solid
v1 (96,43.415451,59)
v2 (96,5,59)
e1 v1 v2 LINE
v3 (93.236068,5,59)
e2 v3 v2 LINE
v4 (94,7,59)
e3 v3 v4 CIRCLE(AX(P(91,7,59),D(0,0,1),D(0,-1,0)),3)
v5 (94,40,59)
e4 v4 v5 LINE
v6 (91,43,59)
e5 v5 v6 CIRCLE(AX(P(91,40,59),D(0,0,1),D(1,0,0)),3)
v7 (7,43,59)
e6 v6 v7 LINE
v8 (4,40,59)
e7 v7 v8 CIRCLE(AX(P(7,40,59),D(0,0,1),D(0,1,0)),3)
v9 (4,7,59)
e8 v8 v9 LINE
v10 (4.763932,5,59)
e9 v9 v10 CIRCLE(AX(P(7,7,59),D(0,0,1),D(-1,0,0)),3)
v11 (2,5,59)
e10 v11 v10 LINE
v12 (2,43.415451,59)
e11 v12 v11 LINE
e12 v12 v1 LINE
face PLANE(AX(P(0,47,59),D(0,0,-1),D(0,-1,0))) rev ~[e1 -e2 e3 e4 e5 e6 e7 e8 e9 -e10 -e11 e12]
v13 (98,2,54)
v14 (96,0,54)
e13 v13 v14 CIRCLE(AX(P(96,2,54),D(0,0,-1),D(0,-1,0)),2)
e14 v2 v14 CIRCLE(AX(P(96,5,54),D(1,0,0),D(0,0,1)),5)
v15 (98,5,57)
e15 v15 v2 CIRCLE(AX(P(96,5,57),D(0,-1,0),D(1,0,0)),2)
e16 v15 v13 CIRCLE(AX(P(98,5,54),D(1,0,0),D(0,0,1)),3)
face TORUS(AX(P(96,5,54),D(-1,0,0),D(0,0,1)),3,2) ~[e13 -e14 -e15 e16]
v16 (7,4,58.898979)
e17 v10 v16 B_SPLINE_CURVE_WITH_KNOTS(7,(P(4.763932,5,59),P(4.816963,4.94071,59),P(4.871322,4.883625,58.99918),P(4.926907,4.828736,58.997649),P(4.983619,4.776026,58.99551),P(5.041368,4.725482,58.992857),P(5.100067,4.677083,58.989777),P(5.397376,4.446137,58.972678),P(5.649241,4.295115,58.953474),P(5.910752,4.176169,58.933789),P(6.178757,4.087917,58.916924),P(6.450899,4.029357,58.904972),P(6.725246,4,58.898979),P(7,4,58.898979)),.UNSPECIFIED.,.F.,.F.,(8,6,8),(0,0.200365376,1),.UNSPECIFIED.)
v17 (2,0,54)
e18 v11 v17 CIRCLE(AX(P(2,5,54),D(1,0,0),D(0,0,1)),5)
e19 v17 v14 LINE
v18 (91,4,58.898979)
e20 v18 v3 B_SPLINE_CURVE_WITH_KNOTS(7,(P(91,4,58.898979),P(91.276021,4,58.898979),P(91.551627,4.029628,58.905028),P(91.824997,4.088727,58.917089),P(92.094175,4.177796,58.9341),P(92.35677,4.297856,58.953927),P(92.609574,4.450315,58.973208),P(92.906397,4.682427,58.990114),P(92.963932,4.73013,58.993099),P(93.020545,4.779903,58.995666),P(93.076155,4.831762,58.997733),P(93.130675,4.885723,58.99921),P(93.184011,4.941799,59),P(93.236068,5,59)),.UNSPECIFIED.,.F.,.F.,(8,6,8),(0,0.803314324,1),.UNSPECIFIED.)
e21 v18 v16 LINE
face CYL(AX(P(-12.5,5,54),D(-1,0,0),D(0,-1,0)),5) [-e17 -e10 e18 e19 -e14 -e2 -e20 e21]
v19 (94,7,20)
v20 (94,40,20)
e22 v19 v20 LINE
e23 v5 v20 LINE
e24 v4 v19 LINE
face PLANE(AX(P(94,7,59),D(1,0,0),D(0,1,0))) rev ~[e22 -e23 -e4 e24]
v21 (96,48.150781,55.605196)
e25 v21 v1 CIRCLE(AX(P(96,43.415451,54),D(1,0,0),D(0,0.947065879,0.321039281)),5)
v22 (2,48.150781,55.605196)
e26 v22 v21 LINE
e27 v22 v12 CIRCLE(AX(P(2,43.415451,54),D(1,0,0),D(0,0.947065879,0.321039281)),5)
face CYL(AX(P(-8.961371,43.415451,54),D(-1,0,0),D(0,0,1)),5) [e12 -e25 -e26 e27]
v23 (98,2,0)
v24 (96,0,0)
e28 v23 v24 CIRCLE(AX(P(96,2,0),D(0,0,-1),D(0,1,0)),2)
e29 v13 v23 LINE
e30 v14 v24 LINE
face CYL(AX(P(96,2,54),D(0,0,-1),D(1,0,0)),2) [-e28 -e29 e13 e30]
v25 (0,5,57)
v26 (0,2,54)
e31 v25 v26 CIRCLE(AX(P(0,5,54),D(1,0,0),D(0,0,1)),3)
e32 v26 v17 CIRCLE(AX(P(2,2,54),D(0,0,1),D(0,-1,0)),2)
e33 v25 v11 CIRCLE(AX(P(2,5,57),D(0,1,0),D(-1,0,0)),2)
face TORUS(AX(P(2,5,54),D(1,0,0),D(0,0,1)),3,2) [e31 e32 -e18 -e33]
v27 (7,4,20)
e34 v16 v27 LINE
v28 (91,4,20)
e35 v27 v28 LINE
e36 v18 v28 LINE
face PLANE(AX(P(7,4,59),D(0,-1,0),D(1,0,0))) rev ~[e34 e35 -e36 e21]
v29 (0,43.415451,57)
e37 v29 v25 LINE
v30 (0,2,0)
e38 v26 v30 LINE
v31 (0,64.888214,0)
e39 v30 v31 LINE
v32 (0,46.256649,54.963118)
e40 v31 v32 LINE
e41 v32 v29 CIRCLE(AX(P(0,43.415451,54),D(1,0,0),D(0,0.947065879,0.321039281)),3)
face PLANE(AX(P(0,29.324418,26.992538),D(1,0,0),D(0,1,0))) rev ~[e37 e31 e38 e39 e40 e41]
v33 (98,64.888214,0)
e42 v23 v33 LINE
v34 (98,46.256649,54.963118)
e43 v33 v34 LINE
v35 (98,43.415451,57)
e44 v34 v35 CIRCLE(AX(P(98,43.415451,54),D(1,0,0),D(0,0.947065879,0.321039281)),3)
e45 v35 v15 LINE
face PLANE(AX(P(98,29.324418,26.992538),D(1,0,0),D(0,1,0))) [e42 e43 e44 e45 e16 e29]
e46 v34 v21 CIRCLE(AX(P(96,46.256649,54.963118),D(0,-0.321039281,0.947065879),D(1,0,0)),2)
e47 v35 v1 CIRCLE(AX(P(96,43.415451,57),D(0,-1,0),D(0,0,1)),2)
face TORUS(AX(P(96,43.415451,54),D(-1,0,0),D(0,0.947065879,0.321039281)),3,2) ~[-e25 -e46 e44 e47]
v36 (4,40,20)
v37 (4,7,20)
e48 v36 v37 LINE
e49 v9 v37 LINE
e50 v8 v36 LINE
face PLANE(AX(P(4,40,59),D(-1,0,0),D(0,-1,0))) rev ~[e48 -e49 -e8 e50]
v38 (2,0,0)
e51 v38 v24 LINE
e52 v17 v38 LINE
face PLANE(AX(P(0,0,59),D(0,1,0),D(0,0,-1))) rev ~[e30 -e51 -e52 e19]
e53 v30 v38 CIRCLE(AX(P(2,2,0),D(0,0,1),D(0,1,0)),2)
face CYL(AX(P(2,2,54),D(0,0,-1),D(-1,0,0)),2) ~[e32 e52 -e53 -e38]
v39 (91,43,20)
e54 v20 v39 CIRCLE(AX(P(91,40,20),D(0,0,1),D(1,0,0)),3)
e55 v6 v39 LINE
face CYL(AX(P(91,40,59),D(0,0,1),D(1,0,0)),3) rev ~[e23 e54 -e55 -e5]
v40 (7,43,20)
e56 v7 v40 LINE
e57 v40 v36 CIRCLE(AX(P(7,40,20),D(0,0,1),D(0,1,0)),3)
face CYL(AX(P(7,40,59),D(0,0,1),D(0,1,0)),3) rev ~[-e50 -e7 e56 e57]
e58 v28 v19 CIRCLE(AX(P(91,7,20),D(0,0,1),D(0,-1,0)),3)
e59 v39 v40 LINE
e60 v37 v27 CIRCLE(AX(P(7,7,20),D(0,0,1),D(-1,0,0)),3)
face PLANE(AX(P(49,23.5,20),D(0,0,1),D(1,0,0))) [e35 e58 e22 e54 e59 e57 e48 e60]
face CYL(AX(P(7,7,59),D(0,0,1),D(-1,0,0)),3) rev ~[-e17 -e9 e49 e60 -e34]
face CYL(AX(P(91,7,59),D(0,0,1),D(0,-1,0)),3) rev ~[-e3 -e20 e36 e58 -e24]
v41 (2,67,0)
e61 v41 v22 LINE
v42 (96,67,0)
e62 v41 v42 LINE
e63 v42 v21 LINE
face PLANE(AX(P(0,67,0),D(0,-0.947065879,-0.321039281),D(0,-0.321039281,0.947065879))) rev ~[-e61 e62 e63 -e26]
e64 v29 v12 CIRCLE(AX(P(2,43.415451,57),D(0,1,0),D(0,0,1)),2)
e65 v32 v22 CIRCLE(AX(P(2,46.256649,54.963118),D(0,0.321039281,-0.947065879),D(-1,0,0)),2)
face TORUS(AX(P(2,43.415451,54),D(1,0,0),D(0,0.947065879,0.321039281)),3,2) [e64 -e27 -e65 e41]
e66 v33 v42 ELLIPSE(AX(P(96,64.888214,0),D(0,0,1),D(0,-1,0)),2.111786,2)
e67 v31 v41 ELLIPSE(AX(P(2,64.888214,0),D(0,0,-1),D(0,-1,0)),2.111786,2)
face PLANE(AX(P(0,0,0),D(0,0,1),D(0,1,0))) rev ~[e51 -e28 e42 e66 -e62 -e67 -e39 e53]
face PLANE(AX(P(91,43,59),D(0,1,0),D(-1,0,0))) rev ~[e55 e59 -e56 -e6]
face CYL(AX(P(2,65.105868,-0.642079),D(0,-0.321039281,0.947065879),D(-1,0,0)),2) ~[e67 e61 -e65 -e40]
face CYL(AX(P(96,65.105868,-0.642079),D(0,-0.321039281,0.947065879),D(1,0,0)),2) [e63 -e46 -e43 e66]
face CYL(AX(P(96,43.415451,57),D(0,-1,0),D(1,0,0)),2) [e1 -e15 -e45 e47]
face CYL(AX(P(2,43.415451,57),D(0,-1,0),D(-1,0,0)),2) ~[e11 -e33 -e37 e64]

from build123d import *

# Parameters (mm, degrees)
F1_DEPTH    = 98
F3_DEPTH    = 39
F4_T1_DEPTH = 123
F4_T3_DEPTH = 115.9227425884
F5_R        = 2


# Not quite as in the source:
# - a fillet or chamfer that OpenCascade refuses, or shapes differently, is made with other operations: its cross-section is extruded or revolved along the edge and cut away or added


with BuildPart() as f1:
    # F0 (on Right) → F1 (new body)
    with BuildSketch(Plane.YZ):
        Polygon((0, 59), (0, 0), (67, 0), (47, 59), align=None)
    extrude(amount=F1_DEPTH)

    # F2 (on face) → F3 (cut)
    with BuildSketch(Plane.XY.offset(59)):
        with BuildLine():
            Line((91, 43), (7, 43))
            ThreePointArc((7, 43), (4.8786796564, 42.1213203436), (4, 40))
            Line((4, 40), (4, 7))
            ThreePointArc((4, 7), (4.8786796564, 4.8786796564), (7, 4))
            Line((7, 4), (91, 4))
            ThreePointArc((91, 4), (93.1213203436, 4.8786796564), (94, 7))
            Line((94, 7), (94, 40))
            ThreePointArc((94, 40), (93.1213203436, 42.1213203436), (91, 43))
        make_face()
    extrude(amount=-F3_DEPTH, mode=Mode.SUBTRACT)

    # F4: fillet of radius 5 on 2 edges, made by hand

    # F4_s2 → F4_t1 (cut)
    with BuildSketch(Plane.YZ.offset(-12.5)):
        with BuildLine():
            ThreePointArc((0, 54), (1.4644660941, 57.5355339059), (5, 59))
            Line((5, 59), (0, 59))
            Line((0, 59), (0, 54))
        make_face()
    extrude(amount=F4_T1_DEPTH, mode=Mode.SUBTRACT)

    # F4_s4 → F4_t3 (cut)
    with BuildSketch(Plane.YZ.offset(-8.9613712942)):
        with BuildLine():
            ThreePointArc((43.4154514823, 59), (46.3286986372, 58.063617971), (48.1507808794, 55.6051964058))
            Line((48.1507808794, 55.6051964058), (47, 59))
            Line((47, 59), (43.4154514823, 59))
        make_face()
    extrude(amount=F4_T3_DEPTH, mode=Mode.SUBTRACT)

    # F5
    f5_edges = [f1.edges().sort_by_distance(p)[0] for p in [
        (0, 24.207726, 59),
        (98, 24.207726, 59),
        (0, 0, 27),
        (98, 0, 27),
        (0, 1.464466, 57.535534),
        (0, 46.328699, 58.063618),
        (0, 57.57539, 27.802598),
        (98, 1.464466, 57.535534),
        (98, 46.328699, 58.063618),
        (98, 57.57539, 27.802598),
    ]]
    fillet(f5_edges, radius=F5_R)


solid = f1.part
